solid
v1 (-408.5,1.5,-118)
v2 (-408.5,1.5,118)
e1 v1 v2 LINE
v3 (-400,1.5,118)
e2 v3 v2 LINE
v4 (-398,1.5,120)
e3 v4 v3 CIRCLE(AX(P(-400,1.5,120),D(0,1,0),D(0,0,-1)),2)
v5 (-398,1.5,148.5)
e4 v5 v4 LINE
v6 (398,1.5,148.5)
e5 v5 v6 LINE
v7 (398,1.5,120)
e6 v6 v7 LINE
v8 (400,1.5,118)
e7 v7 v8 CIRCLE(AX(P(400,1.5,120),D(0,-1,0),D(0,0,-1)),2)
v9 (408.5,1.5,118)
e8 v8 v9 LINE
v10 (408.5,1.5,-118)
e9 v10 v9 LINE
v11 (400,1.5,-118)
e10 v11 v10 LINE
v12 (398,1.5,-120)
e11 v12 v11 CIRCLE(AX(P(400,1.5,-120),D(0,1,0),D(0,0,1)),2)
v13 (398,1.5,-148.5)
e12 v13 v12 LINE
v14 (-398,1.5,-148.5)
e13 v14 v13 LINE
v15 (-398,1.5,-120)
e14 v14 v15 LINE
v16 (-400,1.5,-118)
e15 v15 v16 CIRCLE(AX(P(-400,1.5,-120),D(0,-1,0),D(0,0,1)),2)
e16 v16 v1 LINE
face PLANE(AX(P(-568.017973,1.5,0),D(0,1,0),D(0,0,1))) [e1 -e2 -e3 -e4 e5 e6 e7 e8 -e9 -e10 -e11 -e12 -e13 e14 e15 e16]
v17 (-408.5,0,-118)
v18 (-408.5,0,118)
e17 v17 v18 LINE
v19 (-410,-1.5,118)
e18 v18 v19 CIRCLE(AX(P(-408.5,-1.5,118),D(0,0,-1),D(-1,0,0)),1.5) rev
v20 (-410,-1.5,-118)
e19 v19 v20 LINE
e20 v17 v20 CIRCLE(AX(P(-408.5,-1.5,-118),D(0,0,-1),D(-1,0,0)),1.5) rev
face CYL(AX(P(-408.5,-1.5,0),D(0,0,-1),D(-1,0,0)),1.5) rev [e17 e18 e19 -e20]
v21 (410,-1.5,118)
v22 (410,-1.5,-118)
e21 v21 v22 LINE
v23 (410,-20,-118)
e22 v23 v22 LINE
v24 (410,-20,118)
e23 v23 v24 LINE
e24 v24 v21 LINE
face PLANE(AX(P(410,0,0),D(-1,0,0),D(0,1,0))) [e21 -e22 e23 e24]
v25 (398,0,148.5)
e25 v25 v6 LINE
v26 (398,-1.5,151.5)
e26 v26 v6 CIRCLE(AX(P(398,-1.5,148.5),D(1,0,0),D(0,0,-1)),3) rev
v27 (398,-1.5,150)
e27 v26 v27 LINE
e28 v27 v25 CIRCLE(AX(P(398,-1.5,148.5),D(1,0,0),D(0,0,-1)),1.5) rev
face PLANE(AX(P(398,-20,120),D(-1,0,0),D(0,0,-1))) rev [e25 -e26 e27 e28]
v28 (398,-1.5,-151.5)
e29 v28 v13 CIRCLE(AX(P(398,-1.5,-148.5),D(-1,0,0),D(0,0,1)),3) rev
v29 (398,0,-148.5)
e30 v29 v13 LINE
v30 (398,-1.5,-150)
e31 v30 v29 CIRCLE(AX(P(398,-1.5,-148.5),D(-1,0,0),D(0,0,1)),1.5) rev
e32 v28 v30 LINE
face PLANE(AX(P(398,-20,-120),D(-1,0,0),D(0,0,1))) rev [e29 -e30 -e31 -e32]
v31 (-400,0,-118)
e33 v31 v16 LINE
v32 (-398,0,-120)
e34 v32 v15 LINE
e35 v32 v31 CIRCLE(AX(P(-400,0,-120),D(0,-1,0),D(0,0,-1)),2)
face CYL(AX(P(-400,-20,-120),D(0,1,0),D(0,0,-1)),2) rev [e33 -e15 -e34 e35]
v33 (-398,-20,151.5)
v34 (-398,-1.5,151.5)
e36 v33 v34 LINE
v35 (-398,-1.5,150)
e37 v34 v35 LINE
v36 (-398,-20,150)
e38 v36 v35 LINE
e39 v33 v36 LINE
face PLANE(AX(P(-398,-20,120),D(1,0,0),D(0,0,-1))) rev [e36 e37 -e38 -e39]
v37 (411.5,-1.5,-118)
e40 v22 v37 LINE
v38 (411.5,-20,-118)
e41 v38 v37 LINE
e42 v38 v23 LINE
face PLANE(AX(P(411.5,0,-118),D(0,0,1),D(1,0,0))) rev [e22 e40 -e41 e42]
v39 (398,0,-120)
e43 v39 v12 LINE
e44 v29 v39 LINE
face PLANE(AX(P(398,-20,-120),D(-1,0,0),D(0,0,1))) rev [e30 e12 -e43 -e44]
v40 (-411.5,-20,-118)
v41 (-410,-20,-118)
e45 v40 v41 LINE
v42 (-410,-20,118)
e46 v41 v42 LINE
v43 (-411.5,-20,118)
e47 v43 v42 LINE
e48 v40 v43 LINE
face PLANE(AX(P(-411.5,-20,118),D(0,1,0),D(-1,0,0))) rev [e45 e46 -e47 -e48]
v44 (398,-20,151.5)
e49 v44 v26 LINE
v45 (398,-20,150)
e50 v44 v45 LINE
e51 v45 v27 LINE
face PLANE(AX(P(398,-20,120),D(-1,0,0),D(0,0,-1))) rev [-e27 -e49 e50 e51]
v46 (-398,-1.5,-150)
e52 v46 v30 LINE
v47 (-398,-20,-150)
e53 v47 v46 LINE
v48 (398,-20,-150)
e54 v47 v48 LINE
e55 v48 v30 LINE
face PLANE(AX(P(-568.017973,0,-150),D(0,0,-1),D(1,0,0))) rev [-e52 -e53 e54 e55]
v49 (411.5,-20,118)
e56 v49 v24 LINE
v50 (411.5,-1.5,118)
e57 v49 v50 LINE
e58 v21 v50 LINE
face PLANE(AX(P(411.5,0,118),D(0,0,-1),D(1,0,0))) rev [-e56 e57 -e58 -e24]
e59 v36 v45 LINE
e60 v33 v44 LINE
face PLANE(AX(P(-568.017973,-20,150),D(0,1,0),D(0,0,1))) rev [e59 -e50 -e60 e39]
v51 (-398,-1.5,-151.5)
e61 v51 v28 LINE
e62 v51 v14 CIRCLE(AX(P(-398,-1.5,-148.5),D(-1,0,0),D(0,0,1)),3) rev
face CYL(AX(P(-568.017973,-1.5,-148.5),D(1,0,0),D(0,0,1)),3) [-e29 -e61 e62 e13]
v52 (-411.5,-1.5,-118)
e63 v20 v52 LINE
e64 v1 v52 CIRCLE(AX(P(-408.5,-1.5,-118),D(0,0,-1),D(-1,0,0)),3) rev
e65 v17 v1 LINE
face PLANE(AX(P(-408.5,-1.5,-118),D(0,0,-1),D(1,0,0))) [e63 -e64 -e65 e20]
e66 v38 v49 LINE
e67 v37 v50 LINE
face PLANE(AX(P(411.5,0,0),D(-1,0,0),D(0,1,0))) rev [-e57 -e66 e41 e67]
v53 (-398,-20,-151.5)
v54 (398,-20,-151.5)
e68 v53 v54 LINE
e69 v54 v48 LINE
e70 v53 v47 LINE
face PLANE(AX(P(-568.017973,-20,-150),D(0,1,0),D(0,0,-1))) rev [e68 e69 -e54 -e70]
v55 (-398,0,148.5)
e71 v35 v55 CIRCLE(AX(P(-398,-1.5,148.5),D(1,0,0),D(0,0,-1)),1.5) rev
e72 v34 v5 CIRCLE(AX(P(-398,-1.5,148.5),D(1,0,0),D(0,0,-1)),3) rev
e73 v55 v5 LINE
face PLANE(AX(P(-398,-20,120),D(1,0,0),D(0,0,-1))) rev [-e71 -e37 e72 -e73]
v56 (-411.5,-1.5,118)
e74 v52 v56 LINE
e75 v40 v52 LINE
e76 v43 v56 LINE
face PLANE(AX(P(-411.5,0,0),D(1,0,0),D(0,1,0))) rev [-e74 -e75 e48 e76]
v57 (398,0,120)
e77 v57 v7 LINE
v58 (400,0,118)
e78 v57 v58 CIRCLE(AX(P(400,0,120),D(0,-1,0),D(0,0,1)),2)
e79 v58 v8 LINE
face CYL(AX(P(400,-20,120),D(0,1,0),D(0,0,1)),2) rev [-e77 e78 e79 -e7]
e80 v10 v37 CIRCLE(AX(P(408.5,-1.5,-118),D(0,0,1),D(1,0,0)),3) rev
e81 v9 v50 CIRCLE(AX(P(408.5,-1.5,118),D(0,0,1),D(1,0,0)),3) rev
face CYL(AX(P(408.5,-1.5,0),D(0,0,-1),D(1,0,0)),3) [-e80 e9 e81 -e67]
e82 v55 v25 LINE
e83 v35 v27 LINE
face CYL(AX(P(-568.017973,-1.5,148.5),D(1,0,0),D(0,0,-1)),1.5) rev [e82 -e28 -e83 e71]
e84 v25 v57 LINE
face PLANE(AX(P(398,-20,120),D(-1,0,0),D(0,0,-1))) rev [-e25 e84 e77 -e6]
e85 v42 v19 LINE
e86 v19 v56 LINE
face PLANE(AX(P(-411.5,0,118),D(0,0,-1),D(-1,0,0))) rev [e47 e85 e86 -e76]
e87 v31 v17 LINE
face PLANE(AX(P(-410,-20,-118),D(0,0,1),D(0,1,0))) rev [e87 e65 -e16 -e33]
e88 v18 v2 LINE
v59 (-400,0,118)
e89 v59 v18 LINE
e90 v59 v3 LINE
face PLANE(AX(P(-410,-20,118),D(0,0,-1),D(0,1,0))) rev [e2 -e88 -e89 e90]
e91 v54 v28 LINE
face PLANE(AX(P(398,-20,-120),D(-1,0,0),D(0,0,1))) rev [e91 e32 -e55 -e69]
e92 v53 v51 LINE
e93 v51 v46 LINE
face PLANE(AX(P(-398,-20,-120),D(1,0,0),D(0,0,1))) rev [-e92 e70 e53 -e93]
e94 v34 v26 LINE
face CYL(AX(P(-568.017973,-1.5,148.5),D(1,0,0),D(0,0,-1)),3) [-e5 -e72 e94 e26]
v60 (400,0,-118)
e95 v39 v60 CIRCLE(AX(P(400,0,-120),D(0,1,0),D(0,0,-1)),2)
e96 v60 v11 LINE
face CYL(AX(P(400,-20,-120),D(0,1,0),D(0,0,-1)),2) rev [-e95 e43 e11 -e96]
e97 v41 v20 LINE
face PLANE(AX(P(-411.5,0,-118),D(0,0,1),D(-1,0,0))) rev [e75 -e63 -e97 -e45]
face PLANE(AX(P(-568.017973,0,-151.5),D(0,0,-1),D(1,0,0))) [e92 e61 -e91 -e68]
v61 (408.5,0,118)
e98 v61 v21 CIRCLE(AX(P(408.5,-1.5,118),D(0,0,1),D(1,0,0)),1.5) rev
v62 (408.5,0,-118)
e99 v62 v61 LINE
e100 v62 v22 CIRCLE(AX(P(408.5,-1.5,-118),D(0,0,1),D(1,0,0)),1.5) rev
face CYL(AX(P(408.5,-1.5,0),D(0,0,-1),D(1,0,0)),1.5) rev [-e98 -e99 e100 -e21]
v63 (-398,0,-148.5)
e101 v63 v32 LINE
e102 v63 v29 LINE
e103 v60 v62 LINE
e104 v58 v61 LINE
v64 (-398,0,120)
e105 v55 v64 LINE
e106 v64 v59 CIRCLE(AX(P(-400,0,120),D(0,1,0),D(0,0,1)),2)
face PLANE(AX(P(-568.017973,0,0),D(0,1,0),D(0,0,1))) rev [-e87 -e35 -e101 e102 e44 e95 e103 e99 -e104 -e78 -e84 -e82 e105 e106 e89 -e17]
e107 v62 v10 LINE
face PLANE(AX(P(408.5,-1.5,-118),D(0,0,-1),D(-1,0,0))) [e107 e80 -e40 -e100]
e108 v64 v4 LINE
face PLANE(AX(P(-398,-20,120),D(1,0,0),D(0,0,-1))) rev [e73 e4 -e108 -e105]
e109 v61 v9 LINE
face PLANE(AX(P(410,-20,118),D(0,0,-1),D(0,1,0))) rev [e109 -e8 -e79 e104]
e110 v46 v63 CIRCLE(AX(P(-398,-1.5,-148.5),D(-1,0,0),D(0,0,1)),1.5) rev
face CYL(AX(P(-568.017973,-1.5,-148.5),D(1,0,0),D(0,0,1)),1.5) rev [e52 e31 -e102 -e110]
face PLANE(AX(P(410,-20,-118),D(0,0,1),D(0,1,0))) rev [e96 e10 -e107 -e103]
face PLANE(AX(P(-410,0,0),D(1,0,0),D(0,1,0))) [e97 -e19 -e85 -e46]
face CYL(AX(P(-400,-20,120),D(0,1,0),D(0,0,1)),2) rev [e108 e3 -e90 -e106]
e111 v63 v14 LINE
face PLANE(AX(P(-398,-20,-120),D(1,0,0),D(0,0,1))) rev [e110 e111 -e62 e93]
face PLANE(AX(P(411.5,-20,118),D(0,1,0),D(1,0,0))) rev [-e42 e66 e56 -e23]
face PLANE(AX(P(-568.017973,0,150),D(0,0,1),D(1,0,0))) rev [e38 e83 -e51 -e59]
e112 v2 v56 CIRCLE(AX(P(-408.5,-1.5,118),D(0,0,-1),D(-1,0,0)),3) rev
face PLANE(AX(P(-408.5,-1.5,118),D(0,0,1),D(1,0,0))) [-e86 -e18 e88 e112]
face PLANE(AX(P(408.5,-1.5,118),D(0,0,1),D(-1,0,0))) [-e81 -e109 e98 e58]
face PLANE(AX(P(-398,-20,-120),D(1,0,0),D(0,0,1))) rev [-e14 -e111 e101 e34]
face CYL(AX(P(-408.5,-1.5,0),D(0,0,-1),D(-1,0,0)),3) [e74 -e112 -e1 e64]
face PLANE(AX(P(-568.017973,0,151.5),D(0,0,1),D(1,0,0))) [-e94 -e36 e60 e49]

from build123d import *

# Parameters (mm, degrees)
SM_BASE_FLANGE_1_DEPTH           = 410
CUT_EXTRUDE_1_DEPTH              = 438.623696799
SM_EDGE_FLANGE_1_STRIP_W         = 9
SM_EDGE_FLANGE_1_STRIP_H         = 1.5
SM_EDGE_FLANGE_1_STRIP_CUT_DEPTH = 118
SM_EDGE_FLANGE_1_DEPTH           = 118


# Sheet-metal steps are written as plain solids
with BuildPart() as part:
    # Sketch 1 → Базовая кромка1 (new body)
    with BuildSketch(Plane(origin=(0, 0, 0), x_dir=(0, 0, -1), z_dir=(1, 0, 0))):
        with BuildLine():
            Line((0, 0), (-148.5, 0))
            ThreePointArc((-148.5, 0), (-149.560660172, -0.439339828), (-150, -1.5))
            Line((-150, -1.5), (-150, -20))
            Line((-150, -20), (-151.5, -20))
            Line((-151.5, -20), (-151.5, -1.5))
            ThreePointArc((-151.5, -1.5), (-150.621320344, 0.621320344), (-148.5, 1.5))
            Line((-148.5, 1.5), (0, 1.5))
            Line((0, 1.5), (0, 0))
        make_face()
    extrude(amount=-SM_BASE_FLANGE_1_DEPTH)

    # Эскиз9 → Вырез-Вытянуть1 (cut, through all)
    with BuildSketch(Plane(origin=(0, 1.5, 0), x_dir=(1, 0, 0), z_dir=(0, 1, 0))):
        with BuildLine():
            Line((-410, -118), (-400, -118))
            ThreePointArc((-400, -118), (-398.585786438, -118.585786438), (-398, -120))
            Line((-398, -120), (-398, -151.5))
            Line((-398, -151.5), (-410, -151.5))
            Line((-410, -151.5), (-410, -118))
        make_face()
    extrude(amount=-CUT_EXTRUDE_1_DEPTH, mode=Mode.SUBTRACT)

    # Ребро-кромка1 strip (across the edge) → Ребро-кромка1 strip cut (cut)
    with BuildSketch(Plane(origin=(-410, 0, 118), x_dir=(1, 0, 0), z_dir=(0, 0, -1))):
        with Locations((-3, -0.75)):
            Rectangle(SM_EDGE_FLANGE_1_STRIP_W, SM_EDGE_FLANGE_1_STRIP_H)
    extrude(amount=SM_EDGE_FLANGE_1_STRIP_CUT_DEPTH, mode=Mode.SUBTRACT)

    # Ребро-кромка1 section (across the edge) → Ребро-кромка1 (add)
    with BuildSketch(Plane(origin=(-410, 0, 118), x_dir=(1, 0, 0), z_dir=(0, 0, -1))):
        with BuildLine():
            Line((-1.5, 1.5), (-1.5, 20))
            Line((-1.5, 20), (0, 20))
            Line((0, 20), (0, 1.5))
            ThreePointArc((0, 1.5), (0.439339828, 0.439339828), (1.5, 0))
            Line((1.5, 0), (1.5, -1.5))
            ThreePointArc((1.5, -1.5), (-0.621320344, -0.621320344), (-1.5, 1.5))
        make_face()
    extrude(amount=SM_EDGE_FLANGE_1_DEPTH)

    # Зеркальное отражение1: part across plane


with BuildPart() as part_1:
    add(part.part)
    add(part.part.mirror(Plane(origin=(-568.017972801, 1.5, 0), x_dir=(1, 0, 0), z_dir=(0, 0, 1))))

    # Зеркальное отражение2: part across plane


with BuildPart() as part_2:
    add(part_1.part)
    add(part_1.part.mirror(Plane(origin=(0, 1.5, 148.5), x_dir=(0, 0, 1), z_dir=(1, 0, 0))))


solid = part_2.part
